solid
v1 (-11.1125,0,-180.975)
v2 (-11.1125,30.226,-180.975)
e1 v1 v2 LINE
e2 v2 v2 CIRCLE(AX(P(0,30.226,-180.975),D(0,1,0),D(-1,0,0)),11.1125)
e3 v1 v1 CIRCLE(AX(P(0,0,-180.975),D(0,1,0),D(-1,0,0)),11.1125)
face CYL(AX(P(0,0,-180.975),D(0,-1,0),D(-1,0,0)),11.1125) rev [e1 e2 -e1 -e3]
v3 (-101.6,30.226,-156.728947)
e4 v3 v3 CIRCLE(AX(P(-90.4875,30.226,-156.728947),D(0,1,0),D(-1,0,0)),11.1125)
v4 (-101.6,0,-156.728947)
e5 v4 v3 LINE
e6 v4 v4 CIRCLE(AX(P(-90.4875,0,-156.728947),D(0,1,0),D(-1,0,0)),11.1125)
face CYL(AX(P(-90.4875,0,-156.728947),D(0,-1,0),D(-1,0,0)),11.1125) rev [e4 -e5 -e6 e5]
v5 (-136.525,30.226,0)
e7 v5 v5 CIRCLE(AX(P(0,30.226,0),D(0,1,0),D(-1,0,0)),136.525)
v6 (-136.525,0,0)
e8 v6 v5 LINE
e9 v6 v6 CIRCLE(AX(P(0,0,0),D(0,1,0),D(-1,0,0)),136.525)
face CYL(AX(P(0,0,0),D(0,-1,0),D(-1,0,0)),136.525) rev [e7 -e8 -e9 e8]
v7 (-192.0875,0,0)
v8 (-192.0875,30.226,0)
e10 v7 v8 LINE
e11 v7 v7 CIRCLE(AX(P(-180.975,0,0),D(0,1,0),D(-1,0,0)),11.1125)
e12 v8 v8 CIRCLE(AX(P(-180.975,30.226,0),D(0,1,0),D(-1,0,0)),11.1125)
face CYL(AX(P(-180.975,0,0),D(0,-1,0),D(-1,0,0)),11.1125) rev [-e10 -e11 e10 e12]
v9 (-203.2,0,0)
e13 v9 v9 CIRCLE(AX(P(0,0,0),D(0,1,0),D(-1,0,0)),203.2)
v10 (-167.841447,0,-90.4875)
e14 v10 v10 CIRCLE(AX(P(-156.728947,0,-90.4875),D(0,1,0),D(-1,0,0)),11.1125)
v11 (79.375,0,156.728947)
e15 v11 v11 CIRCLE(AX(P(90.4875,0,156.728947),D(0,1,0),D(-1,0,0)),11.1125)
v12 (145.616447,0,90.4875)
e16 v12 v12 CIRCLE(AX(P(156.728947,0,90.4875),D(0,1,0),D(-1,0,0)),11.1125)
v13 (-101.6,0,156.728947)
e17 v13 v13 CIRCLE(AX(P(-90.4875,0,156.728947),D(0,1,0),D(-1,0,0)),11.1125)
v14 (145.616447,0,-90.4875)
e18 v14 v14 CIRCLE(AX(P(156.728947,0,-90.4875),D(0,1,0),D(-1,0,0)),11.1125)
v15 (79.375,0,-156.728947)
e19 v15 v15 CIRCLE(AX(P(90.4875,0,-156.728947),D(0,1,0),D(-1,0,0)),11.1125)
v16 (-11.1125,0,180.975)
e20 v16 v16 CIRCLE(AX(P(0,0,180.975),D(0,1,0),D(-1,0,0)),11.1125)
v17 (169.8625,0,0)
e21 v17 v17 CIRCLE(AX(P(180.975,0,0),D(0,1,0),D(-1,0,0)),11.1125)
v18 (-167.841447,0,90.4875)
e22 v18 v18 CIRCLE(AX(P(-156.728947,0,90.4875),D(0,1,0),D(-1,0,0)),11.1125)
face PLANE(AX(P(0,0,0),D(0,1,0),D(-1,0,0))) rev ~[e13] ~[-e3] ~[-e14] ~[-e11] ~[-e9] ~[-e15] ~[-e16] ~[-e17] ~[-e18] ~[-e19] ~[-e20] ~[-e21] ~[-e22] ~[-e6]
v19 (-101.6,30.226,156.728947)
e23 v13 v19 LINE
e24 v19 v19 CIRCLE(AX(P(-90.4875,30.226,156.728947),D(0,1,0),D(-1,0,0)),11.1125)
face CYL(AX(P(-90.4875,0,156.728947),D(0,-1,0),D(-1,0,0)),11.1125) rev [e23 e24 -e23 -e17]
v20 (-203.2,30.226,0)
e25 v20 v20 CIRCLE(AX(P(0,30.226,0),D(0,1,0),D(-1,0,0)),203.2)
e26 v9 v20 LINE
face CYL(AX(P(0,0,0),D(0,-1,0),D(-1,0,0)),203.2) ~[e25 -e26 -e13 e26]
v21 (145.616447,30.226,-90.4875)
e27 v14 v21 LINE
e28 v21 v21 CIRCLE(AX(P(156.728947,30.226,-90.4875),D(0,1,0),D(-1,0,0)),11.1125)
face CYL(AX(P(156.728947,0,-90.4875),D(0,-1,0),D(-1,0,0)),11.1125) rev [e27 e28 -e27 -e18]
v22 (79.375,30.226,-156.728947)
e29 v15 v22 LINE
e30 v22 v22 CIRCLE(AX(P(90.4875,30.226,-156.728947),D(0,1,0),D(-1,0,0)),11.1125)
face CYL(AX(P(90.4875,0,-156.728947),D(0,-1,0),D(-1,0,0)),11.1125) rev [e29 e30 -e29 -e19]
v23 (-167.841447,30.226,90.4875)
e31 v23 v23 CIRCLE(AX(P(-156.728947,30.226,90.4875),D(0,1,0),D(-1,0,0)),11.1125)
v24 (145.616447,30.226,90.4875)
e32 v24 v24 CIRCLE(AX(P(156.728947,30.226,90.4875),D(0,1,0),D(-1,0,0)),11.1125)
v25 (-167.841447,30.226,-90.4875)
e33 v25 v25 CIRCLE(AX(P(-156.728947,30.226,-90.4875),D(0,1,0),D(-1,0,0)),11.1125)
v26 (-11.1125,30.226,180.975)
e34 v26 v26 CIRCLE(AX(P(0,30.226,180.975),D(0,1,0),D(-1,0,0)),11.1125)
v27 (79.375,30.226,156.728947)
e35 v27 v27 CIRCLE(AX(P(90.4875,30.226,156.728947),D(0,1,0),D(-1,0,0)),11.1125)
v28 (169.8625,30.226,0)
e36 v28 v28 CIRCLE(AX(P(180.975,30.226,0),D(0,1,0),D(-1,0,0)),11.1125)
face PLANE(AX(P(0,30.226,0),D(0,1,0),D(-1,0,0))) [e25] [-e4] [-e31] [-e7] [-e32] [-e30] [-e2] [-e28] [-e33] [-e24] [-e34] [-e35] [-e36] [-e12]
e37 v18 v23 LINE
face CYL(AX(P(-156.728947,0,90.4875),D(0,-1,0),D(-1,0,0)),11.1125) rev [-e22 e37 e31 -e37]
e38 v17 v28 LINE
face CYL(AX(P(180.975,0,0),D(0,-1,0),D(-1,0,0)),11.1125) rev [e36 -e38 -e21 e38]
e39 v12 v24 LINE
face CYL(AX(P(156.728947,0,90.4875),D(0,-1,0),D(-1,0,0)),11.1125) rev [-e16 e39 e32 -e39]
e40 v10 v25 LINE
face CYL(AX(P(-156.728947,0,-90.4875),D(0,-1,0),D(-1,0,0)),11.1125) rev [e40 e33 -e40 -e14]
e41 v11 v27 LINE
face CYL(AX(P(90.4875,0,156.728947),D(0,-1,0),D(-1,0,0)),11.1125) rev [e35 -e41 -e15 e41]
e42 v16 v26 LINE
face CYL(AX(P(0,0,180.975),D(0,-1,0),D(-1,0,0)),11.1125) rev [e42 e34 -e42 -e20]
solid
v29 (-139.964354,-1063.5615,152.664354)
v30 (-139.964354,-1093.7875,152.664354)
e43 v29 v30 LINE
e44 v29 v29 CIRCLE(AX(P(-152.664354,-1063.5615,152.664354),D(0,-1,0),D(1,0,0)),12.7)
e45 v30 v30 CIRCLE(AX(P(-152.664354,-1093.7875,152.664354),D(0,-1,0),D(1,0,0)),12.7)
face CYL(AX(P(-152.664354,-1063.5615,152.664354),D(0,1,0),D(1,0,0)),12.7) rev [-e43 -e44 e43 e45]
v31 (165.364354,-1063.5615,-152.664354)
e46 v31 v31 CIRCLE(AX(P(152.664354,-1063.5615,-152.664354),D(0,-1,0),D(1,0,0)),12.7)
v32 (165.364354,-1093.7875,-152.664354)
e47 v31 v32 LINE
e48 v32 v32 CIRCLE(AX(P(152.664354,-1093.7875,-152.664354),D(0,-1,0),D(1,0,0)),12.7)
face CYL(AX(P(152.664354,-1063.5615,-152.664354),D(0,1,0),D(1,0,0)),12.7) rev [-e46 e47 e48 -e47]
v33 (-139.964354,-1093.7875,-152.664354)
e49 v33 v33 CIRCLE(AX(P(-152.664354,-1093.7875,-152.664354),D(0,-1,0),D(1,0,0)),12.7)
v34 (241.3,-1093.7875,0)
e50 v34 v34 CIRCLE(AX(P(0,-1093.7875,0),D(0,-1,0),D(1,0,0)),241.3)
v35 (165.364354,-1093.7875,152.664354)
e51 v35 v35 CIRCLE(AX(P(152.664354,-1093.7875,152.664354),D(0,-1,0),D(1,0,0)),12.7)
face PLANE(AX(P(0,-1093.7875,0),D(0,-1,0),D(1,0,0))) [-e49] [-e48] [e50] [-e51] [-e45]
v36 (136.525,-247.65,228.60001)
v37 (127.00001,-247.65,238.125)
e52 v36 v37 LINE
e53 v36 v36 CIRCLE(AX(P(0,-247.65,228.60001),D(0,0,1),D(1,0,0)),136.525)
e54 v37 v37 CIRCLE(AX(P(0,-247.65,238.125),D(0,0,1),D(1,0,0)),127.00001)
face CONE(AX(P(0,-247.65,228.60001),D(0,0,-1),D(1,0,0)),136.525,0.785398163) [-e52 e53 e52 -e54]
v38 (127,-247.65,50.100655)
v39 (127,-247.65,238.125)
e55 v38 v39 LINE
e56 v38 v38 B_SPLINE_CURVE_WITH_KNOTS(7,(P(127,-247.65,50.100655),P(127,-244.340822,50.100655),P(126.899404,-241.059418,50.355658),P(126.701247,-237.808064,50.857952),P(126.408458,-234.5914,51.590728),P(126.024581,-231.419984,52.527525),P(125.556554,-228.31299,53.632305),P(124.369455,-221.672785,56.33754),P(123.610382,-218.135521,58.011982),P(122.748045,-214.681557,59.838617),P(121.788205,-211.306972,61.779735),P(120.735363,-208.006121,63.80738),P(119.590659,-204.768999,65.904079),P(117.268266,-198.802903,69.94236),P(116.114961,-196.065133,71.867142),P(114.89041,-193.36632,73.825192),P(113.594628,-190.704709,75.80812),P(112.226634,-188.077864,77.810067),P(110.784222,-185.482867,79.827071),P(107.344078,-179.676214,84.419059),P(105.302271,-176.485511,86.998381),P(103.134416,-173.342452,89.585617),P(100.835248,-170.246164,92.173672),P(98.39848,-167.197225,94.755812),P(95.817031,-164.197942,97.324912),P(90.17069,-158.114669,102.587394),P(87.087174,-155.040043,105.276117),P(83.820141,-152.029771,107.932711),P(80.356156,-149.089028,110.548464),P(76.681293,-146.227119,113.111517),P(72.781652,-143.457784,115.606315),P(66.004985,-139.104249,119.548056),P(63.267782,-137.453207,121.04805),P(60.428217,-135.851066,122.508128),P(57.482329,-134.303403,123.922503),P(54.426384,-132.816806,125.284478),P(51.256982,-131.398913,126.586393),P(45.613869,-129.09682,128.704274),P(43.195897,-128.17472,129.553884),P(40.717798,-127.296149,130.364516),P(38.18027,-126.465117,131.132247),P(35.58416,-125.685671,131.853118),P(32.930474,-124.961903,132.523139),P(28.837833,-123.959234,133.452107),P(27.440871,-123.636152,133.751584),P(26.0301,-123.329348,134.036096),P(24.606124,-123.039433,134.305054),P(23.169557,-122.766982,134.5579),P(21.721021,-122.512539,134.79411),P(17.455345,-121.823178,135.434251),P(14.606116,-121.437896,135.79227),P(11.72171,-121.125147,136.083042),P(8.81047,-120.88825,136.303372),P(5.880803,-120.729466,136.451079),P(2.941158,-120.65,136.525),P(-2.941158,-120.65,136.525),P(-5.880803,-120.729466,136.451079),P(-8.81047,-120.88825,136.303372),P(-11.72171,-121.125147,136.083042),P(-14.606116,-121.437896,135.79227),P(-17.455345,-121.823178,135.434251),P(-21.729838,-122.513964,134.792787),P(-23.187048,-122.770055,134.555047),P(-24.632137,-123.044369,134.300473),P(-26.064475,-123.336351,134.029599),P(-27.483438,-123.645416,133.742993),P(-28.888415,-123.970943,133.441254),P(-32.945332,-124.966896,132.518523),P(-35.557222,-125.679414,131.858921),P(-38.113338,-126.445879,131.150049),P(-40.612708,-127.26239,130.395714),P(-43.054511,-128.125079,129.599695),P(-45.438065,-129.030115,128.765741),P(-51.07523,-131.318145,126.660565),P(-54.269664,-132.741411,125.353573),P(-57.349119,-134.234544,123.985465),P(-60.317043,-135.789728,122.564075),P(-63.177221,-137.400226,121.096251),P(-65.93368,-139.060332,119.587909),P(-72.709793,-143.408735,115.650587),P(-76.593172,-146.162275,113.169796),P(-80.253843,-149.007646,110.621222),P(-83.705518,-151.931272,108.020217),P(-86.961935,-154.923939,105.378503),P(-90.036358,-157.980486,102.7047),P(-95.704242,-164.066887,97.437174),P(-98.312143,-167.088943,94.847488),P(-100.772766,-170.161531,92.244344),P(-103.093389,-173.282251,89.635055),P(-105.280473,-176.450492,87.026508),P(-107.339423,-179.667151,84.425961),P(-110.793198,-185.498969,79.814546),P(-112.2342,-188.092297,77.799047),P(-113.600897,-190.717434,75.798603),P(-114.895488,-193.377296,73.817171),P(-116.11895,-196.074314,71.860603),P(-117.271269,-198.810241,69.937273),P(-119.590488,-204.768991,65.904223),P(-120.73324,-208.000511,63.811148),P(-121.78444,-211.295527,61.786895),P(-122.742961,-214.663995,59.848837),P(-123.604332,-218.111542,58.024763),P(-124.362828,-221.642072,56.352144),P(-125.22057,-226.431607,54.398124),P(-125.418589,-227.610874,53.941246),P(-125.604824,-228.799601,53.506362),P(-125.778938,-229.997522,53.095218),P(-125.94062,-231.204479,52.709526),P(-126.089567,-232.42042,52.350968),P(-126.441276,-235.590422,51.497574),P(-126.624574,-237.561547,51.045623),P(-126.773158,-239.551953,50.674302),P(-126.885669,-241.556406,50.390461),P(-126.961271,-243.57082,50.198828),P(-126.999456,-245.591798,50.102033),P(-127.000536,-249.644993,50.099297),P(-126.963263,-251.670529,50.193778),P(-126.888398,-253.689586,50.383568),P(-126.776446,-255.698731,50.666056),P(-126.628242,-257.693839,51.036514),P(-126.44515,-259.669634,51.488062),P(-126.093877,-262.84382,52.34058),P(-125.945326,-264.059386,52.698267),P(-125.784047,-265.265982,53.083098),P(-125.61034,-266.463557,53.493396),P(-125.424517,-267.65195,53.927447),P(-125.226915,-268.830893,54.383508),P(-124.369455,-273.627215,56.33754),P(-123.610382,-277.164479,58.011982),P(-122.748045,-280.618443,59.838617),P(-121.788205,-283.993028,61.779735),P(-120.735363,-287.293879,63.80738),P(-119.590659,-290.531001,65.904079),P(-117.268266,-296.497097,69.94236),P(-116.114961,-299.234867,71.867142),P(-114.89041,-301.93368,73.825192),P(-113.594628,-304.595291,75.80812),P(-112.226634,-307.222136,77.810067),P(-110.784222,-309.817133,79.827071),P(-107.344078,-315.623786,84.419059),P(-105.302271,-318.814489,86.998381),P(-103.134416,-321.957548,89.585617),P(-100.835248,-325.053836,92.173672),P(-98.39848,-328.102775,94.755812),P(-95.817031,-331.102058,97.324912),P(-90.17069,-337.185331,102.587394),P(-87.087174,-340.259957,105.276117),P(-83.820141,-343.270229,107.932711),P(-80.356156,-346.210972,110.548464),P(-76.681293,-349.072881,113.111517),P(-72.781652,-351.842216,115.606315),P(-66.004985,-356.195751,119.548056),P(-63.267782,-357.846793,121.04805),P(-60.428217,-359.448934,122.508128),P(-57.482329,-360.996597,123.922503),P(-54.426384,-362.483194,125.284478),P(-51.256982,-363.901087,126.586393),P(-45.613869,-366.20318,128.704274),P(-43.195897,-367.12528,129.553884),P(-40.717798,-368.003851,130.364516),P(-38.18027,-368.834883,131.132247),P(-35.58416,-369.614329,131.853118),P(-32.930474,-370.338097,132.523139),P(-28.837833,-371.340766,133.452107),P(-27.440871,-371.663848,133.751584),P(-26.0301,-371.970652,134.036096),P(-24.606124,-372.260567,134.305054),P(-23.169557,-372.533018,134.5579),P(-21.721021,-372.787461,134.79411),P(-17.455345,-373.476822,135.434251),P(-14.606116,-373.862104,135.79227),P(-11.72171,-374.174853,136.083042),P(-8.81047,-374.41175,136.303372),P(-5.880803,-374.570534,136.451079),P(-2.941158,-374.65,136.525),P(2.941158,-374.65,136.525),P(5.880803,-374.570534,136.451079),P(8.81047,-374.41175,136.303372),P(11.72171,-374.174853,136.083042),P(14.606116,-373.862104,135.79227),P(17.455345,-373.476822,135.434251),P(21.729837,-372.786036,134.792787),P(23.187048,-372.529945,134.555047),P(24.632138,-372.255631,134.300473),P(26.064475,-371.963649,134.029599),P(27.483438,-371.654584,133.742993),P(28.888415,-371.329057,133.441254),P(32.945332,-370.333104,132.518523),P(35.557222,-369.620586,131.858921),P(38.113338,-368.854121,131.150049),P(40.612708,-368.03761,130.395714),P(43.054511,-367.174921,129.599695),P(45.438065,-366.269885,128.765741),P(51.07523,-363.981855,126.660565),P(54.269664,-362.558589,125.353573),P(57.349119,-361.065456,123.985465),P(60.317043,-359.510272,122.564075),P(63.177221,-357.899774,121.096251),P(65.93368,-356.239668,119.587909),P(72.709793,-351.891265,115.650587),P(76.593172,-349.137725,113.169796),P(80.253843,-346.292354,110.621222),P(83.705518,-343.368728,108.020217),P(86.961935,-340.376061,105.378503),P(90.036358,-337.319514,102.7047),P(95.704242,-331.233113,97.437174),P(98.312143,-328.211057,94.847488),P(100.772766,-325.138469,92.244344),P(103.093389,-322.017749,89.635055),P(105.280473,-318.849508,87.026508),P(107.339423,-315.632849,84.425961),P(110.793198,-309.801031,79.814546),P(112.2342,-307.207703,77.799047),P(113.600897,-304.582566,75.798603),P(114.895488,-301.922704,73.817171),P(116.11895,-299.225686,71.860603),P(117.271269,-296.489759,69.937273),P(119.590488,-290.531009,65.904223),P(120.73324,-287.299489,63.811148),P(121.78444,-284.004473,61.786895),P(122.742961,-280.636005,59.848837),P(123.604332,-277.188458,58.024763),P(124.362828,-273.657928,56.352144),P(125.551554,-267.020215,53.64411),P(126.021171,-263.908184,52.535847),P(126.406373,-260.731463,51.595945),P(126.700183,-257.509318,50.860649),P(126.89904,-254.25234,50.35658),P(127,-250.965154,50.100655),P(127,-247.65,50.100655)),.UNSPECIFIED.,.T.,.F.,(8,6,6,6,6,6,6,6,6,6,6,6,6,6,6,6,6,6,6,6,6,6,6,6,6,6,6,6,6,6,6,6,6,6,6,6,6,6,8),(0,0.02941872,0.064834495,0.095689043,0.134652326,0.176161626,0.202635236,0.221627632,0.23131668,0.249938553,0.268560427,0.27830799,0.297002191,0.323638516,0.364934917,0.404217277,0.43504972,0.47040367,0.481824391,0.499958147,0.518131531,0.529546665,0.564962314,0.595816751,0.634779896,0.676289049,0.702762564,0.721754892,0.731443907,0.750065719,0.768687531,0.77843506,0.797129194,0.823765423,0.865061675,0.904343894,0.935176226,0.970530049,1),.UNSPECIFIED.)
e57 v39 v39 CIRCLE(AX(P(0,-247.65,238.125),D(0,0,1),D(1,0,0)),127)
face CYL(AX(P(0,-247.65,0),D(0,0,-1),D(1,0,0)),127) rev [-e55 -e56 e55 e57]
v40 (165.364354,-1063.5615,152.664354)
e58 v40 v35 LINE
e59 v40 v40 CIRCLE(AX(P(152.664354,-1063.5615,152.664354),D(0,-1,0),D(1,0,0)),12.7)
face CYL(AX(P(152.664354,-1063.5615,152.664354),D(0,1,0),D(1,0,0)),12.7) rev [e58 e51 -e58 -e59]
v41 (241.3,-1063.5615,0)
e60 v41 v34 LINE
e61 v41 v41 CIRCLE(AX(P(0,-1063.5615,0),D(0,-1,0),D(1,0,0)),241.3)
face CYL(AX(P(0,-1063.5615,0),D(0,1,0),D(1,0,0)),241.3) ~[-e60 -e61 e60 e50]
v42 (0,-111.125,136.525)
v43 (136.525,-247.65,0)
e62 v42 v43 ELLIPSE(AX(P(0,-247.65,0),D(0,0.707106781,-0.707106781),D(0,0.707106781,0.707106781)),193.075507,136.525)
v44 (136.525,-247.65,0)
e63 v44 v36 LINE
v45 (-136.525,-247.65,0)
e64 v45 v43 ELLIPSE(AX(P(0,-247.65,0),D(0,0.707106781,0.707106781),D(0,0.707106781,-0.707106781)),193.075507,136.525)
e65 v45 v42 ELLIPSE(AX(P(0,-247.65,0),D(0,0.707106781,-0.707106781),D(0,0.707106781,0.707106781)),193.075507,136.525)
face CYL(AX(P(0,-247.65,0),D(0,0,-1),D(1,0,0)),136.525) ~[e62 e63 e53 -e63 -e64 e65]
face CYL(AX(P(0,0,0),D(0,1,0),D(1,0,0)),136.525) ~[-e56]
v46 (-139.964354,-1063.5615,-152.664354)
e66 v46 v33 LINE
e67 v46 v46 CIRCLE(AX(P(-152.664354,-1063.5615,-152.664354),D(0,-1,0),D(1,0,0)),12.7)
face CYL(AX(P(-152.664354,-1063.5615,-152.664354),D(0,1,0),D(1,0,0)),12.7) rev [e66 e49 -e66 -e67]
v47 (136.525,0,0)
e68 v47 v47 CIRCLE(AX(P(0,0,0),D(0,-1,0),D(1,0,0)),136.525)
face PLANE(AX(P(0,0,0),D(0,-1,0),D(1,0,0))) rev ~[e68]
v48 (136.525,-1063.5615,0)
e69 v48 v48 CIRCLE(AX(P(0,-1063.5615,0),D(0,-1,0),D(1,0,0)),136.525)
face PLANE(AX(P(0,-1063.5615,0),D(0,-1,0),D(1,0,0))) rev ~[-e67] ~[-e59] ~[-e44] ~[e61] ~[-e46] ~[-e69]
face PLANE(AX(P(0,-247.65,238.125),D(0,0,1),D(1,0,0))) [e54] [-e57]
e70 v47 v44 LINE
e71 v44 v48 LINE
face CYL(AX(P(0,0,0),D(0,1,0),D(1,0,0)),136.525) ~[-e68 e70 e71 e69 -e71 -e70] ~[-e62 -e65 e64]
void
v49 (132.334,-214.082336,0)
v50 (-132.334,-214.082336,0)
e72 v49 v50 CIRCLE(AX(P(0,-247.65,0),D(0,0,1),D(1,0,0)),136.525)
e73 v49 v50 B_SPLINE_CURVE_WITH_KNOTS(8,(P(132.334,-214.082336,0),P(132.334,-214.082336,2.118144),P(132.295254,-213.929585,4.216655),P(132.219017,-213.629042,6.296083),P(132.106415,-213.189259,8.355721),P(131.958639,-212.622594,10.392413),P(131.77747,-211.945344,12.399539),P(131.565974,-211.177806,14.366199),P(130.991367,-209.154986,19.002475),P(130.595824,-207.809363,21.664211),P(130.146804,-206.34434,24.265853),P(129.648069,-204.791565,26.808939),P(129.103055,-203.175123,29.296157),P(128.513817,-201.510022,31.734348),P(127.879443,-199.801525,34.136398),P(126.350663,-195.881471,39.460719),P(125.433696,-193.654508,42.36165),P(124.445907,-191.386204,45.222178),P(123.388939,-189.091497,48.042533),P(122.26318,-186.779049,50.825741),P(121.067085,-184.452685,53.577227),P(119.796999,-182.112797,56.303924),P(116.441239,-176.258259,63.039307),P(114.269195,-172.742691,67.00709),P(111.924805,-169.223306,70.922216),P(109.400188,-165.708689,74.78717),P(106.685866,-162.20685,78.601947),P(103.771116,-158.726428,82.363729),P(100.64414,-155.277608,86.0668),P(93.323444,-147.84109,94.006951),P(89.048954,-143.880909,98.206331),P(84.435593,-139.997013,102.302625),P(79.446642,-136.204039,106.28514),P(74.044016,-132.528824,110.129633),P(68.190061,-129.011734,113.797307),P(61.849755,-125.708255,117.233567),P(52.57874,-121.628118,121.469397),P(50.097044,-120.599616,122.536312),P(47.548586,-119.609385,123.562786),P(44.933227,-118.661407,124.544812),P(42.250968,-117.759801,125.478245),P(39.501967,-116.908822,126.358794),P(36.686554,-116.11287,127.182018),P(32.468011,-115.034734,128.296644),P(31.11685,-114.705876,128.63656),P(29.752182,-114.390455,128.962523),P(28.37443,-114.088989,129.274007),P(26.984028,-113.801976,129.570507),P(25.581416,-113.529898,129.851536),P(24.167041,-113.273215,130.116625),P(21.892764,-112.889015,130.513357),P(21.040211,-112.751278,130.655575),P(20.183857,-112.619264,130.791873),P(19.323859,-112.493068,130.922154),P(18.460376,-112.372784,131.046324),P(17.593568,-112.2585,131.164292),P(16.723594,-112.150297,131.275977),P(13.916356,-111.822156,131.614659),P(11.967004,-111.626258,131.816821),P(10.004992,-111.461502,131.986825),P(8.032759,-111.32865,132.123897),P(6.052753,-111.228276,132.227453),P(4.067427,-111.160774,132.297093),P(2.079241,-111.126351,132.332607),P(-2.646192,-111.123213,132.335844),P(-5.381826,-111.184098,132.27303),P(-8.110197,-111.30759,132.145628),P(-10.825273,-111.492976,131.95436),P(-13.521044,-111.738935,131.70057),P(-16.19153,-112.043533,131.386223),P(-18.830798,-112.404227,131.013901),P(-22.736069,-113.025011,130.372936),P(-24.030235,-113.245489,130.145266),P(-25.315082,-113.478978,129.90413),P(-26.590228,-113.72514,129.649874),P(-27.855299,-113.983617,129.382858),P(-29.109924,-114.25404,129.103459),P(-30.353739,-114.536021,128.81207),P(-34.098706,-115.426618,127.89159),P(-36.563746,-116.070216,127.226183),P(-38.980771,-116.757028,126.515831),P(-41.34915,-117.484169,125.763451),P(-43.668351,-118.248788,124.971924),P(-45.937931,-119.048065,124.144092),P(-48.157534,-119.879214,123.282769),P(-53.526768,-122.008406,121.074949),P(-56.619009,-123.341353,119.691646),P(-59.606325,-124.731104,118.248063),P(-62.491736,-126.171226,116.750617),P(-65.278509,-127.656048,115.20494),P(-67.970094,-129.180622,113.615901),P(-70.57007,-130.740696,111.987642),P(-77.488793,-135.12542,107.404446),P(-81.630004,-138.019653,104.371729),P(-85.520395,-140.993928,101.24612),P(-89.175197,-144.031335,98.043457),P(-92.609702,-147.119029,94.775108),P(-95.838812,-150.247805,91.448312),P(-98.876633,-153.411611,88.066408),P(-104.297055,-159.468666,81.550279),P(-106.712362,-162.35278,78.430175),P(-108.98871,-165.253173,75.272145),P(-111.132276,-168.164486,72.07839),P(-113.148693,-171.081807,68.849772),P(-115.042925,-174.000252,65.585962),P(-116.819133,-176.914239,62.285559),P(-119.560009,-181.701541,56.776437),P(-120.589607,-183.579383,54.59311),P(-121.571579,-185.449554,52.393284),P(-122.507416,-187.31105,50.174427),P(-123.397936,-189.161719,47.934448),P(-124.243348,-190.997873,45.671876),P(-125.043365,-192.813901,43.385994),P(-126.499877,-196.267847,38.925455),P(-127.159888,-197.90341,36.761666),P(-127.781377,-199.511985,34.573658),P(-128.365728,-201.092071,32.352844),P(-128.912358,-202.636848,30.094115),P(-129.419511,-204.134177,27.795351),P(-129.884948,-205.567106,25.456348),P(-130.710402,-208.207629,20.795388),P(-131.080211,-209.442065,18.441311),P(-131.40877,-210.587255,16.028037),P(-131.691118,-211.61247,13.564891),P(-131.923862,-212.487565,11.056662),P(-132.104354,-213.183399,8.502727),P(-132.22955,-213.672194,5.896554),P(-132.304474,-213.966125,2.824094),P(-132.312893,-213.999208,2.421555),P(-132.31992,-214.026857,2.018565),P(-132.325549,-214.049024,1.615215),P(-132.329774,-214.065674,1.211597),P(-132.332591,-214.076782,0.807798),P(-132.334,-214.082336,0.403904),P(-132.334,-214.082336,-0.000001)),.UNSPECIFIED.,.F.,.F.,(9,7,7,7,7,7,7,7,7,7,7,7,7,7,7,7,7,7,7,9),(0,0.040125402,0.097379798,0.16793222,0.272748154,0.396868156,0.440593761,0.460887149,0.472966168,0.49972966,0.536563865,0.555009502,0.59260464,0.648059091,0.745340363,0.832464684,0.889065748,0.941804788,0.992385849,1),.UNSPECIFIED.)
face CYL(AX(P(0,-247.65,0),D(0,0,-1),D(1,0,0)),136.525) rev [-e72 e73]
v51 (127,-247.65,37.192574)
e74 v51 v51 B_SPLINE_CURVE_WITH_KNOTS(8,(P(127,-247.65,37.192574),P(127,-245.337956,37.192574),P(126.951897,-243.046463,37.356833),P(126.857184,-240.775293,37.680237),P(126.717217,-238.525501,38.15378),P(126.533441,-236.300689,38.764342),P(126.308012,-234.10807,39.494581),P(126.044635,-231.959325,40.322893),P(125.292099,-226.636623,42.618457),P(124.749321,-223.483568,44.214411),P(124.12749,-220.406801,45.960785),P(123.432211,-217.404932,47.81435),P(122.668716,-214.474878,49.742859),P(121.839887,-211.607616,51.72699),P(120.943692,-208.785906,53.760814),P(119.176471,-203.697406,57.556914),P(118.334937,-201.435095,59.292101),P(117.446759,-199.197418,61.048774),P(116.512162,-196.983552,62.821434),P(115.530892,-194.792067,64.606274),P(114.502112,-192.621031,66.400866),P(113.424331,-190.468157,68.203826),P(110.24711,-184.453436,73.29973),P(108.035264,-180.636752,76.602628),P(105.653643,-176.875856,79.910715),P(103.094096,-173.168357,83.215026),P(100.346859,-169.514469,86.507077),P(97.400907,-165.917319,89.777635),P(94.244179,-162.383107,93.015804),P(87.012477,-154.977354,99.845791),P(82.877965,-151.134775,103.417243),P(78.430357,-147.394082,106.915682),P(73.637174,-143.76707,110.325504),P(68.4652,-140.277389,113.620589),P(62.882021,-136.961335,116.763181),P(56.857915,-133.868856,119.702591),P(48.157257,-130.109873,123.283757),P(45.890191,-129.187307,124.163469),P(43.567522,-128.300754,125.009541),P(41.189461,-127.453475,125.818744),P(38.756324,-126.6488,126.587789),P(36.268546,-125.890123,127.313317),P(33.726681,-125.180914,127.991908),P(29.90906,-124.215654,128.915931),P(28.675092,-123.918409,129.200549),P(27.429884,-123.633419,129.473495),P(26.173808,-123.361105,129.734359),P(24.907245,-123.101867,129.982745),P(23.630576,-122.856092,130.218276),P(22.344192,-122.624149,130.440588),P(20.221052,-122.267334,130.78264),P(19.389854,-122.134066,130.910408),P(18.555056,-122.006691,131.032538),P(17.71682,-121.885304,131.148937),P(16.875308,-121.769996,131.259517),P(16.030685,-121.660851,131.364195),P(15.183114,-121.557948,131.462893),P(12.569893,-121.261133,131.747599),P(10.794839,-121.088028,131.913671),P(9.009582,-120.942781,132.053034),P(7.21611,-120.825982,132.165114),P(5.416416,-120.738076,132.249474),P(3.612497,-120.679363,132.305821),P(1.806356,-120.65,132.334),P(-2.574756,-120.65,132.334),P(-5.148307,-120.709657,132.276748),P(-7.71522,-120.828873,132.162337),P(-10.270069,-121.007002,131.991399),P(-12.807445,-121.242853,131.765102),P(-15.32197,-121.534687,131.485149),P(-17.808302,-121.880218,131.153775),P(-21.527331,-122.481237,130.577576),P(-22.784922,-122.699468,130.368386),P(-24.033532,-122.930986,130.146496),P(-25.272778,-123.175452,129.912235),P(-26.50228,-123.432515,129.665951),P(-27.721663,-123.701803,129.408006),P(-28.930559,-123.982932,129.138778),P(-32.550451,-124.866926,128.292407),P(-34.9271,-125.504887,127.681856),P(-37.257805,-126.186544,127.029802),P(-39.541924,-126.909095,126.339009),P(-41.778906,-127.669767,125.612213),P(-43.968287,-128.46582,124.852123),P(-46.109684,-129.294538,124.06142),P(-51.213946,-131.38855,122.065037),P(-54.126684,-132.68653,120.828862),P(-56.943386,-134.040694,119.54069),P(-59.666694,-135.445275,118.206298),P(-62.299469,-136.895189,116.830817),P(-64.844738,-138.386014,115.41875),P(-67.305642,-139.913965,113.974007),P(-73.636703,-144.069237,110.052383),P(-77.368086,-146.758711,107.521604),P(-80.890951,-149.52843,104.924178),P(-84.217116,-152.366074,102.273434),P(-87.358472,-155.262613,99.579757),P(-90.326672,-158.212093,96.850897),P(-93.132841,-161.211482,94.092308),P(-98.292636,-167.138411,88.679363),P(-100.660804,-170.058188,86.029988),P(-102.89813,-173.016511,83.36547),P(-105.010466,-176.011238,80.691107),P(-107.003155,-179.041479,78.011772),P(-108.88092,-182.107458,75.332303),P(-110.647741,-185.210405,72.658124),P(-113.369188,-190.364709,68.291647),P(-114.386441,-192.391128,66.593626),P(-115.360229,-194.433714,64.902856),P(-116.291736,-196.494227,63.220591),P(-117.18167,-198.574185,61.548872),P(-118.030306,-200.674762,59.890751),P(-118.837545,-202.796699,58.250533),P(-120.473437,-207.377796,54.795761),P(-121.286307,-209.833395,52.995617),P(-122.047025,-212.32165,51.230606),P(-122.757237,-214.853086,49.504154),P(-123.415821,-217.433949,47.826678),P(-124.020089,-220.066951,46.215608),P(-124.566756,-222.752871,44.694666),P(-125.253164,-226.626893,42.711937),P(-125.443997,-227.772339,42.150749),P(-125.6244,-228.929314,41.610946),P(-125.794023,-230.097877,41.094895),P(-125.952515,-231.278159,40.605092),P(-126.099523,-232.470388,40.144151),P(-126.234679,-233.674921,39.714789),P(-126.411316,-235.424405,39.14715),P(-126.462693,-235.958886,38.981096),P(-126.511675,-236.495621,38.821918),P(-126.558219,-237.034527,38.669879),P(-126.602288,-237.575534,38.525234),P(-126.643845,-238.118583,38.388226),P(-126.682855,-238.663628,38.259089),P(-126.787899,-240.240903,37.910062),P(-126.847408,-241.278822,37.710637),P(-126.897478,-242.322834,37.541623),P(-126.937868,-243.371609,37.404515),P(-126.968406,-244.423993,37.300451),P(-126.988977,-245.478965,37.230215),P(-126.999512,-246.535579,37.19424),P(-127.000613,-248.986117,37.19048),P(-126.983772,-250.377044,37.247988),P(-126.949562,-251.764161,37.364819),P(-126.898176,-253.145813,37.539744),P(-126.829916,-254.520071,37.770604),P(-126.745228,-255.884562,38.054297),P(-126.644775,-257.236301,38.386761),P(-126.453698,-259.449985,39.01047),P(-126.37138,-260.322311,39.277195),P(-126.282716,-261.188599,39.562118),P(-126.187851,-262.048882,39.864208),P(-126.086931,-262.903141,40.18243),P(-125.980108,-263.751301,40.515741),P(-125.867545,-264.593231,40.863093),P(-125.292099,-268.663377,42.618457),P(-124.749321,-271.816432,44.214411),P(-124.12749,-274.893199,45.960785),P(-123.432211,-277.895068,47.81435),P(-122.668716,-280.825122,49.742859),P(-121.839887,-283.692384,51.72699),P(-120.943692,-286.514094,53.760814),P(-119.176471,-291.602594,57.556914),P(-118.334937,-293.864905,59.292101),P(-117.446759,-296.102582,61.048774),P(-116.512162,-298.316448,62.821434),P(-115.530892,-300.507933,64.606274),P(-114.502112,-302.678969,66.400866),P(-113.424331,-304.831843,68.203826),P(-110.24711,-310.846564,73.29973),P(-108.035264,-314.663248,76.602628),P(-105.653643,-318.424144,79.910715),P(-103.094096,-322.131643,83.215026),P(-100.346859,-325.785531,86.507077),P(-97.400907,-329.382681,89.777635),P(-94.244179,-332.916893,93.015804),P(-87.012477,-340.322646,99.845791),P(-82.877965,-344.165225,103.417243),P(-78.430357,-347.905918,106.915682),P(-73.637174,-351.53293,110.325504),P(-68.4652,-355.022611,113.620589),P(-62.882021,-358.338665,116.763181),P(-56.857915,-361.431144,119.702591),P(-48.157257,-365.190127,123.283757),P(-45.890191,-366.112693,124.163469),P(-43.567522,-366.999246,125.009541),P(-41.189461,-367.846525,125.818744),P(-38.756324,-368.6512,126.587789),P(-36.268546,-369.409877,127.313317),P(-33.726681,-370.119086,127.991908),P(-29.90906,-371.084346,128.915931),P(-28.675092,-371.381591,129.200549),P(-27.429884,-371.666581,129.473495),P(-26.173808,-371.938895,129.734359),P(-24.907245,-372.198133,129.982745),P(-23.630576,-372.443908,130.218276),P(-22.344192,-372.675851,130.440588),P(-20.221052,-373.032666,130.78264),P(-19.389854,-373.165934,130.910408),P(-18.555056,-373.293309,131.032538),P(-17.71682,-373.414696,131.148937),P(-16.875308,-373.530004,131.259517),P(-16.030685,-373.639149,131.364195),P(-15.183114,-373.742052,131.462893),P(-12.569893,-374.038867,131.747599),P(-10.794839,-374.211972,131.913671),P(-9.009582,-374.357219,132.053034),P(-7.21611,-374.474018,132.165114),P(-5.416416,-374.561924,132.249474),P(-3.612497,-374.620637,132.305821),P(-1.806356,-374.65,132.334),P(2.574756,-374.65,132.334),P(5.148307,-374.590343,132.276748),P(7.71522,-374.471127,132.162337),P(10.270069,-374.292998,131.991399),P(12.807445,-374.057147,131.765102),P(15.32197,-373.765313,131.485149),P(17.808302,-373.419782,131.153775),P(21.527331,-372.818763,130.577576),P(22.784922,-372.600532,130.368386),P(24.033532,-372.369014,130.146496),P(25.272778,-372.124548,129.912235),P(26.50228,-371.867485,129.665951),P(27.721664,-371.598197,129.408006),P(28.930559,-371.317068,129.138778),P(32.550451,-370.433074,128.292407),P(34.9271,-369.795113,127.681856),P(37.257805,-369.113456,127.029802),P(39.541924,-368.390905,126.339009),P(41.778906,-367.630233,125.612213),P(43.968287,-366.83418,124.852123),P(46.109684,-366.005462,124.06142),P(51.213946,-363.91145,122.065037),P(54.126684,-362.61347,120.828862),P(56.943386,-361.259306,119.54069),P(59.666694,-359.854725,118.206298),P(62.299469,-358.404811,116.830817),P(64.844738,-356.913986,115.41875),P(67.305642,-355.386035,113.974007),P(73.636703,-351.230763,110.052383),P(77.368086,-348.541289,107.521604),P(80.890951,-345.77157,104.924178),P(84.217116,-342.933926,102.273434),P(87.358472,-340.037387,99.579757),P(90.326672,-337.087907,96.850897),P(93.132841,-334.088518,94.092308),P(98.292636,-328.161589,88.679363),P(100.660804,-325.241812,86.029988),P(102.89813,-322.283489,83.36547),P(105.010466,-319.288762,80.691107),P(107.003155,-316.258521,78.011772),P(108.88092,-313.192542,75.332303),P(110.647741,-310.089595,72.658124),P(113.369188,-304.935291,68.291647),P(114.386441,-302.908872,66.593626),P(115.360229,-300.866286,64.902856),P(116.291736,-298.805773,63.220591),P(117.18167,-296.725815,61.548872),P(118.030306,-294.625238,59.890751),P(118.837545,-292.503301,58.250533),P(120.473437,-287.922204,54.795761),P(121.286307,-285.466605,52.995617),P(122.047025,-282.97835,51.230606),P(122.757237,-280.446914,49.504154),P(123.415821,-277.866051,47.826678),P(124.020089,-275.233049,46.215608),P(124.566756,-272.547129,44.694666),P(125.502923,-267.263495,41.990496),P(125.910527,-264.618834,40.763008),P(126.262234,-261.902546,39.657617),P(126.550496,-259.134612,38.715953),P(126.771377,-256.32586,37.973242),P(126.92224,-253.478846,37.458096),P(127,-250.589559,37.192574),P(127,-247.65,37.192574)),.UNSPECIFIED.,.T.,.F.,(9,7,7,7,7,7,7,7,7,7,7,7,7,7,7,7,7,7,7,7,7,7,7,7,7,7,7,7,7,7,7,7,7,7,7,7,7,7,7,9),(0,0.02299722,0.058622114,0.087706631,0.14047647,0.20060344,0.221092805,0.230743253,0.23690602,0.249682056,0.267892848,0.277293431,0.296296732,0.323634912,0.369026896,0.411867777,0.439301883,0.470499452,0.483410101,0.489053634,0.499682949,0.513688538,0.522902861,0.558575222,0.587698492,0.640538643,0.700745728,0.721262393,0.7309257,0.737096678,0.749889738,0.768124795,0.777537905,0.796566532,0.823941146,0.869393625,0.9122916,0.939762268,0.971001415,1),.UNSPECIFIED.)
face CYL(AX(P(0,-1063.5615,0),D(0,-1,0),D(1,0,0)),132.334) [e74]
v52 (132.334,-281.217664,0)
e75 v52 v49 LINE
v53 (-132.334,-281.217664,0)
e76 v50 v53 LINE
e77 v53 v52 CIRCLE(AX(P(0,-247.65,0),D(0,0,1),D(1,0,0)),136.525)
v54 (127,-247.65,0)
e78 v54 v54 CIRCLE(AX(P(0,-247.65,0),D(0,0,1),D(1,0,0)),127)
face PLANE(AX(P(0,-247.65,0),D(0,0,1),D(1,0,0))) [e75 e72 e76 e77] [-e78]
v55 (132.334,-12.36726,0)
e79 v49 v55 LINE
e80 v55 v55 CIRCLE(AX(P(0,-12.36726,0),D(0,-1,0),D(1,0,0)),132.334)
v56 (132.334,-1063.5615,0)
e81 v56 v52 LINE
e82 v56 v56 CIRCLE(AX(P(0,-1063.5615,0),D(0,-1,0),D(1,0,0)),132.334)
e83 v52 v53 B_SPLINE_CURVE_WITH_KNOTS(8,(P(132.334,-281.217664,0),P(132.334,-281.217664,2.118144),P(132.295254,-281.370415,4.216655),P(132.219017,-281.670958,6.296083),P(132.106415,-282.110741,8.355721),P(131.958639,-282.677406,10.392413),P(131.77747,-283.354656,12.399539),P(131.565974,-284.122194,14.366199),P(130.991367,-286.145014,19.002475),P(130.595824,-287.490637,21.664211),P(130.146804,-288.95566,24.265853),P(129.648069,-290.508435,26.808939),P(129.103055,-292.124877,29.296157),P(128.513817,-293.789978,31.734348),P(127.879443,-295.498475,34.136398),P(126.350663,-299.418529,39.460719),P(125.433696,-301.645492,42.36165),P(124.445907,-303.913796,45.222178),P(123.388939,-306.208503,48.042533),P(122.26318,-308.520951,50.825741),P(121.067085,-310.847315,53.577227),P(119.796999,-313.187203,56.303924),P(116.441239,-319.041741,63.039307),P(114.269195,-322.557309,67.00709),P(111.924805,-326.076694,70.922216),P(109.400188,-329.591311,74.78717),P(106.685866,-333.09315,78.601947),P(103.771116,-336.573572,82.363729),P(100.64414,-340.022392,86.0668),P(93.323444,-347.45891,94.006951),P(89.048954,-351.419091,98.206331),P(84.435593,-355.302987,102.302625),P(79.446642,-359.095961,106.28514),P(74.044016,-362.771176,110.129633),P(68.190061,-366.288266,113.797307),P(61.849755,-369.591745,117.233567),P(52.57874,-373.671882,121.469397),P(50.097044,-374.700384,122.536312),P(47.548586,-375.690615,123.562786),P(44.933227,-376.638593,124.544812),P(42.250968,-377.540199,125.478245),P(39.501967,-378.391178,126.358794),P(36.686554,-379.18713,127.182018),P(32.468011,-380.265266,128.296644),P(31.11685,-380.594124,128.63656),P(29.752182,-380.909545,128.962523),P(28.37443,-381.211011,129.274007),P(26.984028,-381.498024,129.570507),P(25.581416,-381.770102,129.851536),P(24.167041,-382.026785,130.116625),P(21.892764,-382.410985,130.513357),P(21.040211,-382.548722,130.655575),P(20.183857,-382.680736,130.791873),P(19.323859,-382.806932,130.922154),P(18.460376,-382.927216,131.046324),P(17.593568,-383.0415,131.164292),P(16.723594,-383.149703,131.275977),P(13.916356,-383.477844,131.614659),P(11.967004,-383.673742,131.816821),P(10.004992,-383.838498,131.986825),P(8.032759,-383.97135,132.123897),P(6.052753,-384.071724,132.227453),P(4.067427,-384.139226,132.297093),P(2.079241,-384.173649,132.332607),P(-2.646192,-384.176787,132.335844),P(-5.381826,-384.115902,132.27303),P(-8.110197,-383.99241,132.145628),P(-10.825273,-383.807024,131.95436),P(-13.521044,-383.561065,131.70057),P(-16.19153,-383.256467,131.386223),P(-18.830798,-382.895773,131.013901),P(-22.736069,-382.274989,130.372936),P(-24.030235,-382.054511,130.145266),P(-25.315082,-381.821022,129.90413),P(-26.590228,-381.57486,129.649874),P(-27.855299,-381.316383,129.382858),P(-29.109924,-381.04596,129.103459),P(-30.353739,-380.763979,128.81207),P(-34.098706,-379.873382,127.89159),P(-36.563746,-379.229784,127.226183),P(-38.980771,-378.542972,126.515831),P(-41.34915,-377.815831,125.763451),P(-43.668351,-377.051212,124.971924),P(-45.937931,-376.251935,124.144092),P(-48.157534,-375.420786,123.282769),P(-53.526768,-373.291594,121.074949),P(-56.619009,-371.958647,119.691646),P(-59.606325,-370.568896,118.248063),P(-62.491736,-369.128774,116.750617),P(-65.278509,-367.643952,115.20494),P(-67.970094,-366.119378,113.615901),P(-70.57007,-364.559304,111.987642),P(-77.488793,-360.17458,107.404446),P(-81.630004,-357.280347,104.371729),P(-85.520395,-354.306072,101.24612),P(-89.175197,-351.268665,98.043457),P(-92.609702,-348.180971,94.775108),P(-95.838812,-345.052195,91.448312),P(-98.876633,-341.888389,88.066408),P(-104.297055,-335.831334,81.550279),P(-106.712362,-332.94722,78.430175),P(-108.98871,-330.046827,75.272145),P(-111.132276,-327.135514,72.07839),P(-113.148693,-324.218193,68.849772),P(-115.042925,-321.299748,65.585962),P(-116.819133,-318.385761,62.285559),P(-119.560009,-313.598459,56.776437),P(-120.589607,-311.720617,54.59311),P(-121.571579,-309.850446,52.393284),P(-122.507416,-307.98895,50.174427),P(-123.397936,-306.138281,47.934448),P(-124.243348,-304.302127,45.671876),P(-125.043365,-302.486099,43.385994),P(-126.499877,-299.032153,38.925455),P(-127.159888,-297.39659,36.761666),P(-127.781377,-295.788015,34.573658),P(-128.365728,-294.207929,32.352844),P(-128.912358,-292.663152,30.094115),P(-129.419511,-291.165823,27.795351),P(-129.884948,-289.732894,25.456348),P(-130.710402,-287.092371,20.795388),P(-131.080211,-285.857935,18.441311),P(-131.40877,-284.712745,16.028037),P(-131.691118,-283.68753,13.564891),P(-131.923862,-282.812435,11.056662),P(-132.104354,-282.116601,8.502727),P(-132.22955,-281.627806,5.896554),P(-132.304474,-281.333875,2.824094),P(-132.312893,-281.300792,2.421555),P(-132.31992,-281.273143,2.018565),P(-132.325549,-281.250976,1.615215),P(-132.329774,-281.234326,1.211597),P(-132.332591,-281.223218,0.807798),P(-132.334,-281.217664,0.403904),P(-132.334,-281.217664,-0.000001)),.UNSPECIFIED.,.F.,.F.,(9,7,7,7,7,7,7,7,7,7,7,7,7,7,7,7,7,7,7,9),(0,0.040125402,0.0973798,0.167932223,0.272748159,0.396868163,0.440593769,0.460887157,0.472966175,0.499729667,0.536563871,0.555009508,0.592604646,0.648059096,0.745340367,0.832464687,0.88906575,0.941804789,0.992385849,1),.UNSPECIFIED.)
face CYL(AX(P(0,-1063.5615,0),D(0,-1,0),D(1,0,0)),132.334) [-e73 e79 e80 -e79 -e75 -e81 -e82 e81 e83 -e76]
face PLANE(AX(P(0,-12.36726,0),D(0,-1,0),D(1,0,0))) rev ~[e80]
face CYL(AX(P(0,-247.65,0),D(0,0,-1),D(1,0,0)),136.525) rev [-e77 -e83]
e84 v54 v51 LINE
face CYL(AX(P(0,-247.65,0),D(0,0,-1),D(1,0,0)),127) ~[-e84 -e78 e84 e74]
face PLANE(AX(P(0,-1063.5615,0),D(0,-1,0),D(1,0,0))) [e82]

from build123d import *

# Parameters (mm, degrees)
F0_R      = 136.525
F1_DEPTH  = 1063.5615
F2_R      = 132.334
F3_DEPTH  = 1051.19424
F4_R      = 241.3
F4_R_2    = 12.7
F5_DEPTH  = 30.226
F6_R      = 203.2
F6_R_2    = 11.1125
F6_R_3    = 136.525
F7_DEPTH  = 30.226
F8_R      = 136.525
F8_R_2    = 127
F9_DEPTH  = 238.125
F10_SIZE  = 9.52499
F11_R     = 127
F12_DEPTH = 25.4


# Not quite as in the source:
# - a fillet or chamfer is up to 0.001 mm smaller than in the source, because OpenCascade refuses the exact size


with BuildPart() as f1:
    # F0 (on Front) → F1 (new body)
    with BuildSketch(Plane.XZ):
        Circle(F0_R)
    extrude(amount=F1_DEPTH)

    # F2 (on face) → F3 (cut)
    with BuildSketch(Plane.XZ.offset(1063.5615)):
        Circle(F2_R)
    extrude(amount=-F3_DEPTH, mode=Mode.SUBTRACT)

    # F4 (on face) → F5 (join)
    with BuildSketch(Plane.XZ.offset(1063.5615)):
        Circle(F4_R)
        with Locations((-152.6643540582, -152.6643540582)):
            Circle(F4_R_2, mode=Mode.SUBTRACT)
        with Locations((152.6643540582, -152.6643540582)):
            Circle(F4_R_2, mode=Mode.SUBTRACT)
        with Locations((-152.6643540582, 152.6643540582)):
            Circle(F4_R_2, mode=Mode.SUBTRACT)
        with Locations((152.6643540582, 152.6643540582)):
            Circle(F4_R_2, mode=Mode.SUBTRACT)
    extrude(amount=F5_DEPTH)

    # F8 (on Top) → F9 (join)
    with BuildSketch(Plane.XY):
        with Locations((0, -247.65)):
            Circle(F8_R)
        with Locations((0, -247.65)):
            Circle(F8_R_2, mode=Mode.SUBTRACT)
    extrude(amount=F9_DEPTH)

    # F10 (size 9.525 in the source; OpenCascade refuses exactly that, so slightly less here)
    f10_edges = [f1.edges().sort_by_distance(p)[0] for p in [
        (-136.525, -247.65, 238.125),
    ]]
    chamfer(f10_edges, length=F10_SIZE)

    # F11 (on Top) → F12 (cut)
    with BuildSketch(Plane.XY):
        with Locations((0, -247.65)):
            Circle(F11_R)
    extrude(amount=-F12_DEPTH, mode=Mode.SUBTRACT)


with BuildPart() as f7:
    # F6 (on face) → F7 (new body)
    with BuildSketch(Plane(origin=(0, 0, 0), x_dir=(-1, 0, 0), z_dir=(0, 1, 0))):
        Circle(F6_R)
        with Locations((-90.4875, -156.7289474499)):
            Circle(F6_R_2, mode=Mode.SUBTRACT)
        with Locations((0, -180.975)):
            Circle(F6_R_2, mode=Mode.SUBTRACT)
        with Locations((-156.7289474499, -90.4875)):
            Circle(F6_R_2, mode=Mode.SUBTRACT)
        with Locations((-180.975, 0)):
            Circle(F6_R_2, mode=Mode.SUBTRACT)
        Circle(F6_R_3, mode=Mode.SUBTRACT)
        with Locations((90.4875, -156.7289474499)):
            Circle(F6_R_2, mode=Mode.SUBTRACT)
        with Locations((156.7289474499, -90.4875)):
            Circle(F6_R_2, mode=Mode.SUBTRACT)
        with Locations((180.975, 0)):
            Circle(F6_R_2, mode=Mode.SUBTRACT)
        with Locations((-156.7289474499, 90.4875)):
            Circle(F6_R_2, mode=Mode.SUBTRACT)
        with Locations((-90.4875, 156.7289474499)):
            Circle(F6_R_2, mode=Mode.SUBTRACT)
        with Locations((0, 180.975)):
            Circle(F6_R_2, mode=Mode.SUBTRACT)
        with Locations((156.7289474499, 90.4875)):
            Circle(F6_R_2, mode=Mode.SUBTRACT)
        with Locations((90.4875, 156.7289474499)):
            Circle(F6_R_2, mode=Mode.SUBTRACT)
    extrude(amount=F7_DEPTH)


solid = Compound([f1.part, f7.part])
